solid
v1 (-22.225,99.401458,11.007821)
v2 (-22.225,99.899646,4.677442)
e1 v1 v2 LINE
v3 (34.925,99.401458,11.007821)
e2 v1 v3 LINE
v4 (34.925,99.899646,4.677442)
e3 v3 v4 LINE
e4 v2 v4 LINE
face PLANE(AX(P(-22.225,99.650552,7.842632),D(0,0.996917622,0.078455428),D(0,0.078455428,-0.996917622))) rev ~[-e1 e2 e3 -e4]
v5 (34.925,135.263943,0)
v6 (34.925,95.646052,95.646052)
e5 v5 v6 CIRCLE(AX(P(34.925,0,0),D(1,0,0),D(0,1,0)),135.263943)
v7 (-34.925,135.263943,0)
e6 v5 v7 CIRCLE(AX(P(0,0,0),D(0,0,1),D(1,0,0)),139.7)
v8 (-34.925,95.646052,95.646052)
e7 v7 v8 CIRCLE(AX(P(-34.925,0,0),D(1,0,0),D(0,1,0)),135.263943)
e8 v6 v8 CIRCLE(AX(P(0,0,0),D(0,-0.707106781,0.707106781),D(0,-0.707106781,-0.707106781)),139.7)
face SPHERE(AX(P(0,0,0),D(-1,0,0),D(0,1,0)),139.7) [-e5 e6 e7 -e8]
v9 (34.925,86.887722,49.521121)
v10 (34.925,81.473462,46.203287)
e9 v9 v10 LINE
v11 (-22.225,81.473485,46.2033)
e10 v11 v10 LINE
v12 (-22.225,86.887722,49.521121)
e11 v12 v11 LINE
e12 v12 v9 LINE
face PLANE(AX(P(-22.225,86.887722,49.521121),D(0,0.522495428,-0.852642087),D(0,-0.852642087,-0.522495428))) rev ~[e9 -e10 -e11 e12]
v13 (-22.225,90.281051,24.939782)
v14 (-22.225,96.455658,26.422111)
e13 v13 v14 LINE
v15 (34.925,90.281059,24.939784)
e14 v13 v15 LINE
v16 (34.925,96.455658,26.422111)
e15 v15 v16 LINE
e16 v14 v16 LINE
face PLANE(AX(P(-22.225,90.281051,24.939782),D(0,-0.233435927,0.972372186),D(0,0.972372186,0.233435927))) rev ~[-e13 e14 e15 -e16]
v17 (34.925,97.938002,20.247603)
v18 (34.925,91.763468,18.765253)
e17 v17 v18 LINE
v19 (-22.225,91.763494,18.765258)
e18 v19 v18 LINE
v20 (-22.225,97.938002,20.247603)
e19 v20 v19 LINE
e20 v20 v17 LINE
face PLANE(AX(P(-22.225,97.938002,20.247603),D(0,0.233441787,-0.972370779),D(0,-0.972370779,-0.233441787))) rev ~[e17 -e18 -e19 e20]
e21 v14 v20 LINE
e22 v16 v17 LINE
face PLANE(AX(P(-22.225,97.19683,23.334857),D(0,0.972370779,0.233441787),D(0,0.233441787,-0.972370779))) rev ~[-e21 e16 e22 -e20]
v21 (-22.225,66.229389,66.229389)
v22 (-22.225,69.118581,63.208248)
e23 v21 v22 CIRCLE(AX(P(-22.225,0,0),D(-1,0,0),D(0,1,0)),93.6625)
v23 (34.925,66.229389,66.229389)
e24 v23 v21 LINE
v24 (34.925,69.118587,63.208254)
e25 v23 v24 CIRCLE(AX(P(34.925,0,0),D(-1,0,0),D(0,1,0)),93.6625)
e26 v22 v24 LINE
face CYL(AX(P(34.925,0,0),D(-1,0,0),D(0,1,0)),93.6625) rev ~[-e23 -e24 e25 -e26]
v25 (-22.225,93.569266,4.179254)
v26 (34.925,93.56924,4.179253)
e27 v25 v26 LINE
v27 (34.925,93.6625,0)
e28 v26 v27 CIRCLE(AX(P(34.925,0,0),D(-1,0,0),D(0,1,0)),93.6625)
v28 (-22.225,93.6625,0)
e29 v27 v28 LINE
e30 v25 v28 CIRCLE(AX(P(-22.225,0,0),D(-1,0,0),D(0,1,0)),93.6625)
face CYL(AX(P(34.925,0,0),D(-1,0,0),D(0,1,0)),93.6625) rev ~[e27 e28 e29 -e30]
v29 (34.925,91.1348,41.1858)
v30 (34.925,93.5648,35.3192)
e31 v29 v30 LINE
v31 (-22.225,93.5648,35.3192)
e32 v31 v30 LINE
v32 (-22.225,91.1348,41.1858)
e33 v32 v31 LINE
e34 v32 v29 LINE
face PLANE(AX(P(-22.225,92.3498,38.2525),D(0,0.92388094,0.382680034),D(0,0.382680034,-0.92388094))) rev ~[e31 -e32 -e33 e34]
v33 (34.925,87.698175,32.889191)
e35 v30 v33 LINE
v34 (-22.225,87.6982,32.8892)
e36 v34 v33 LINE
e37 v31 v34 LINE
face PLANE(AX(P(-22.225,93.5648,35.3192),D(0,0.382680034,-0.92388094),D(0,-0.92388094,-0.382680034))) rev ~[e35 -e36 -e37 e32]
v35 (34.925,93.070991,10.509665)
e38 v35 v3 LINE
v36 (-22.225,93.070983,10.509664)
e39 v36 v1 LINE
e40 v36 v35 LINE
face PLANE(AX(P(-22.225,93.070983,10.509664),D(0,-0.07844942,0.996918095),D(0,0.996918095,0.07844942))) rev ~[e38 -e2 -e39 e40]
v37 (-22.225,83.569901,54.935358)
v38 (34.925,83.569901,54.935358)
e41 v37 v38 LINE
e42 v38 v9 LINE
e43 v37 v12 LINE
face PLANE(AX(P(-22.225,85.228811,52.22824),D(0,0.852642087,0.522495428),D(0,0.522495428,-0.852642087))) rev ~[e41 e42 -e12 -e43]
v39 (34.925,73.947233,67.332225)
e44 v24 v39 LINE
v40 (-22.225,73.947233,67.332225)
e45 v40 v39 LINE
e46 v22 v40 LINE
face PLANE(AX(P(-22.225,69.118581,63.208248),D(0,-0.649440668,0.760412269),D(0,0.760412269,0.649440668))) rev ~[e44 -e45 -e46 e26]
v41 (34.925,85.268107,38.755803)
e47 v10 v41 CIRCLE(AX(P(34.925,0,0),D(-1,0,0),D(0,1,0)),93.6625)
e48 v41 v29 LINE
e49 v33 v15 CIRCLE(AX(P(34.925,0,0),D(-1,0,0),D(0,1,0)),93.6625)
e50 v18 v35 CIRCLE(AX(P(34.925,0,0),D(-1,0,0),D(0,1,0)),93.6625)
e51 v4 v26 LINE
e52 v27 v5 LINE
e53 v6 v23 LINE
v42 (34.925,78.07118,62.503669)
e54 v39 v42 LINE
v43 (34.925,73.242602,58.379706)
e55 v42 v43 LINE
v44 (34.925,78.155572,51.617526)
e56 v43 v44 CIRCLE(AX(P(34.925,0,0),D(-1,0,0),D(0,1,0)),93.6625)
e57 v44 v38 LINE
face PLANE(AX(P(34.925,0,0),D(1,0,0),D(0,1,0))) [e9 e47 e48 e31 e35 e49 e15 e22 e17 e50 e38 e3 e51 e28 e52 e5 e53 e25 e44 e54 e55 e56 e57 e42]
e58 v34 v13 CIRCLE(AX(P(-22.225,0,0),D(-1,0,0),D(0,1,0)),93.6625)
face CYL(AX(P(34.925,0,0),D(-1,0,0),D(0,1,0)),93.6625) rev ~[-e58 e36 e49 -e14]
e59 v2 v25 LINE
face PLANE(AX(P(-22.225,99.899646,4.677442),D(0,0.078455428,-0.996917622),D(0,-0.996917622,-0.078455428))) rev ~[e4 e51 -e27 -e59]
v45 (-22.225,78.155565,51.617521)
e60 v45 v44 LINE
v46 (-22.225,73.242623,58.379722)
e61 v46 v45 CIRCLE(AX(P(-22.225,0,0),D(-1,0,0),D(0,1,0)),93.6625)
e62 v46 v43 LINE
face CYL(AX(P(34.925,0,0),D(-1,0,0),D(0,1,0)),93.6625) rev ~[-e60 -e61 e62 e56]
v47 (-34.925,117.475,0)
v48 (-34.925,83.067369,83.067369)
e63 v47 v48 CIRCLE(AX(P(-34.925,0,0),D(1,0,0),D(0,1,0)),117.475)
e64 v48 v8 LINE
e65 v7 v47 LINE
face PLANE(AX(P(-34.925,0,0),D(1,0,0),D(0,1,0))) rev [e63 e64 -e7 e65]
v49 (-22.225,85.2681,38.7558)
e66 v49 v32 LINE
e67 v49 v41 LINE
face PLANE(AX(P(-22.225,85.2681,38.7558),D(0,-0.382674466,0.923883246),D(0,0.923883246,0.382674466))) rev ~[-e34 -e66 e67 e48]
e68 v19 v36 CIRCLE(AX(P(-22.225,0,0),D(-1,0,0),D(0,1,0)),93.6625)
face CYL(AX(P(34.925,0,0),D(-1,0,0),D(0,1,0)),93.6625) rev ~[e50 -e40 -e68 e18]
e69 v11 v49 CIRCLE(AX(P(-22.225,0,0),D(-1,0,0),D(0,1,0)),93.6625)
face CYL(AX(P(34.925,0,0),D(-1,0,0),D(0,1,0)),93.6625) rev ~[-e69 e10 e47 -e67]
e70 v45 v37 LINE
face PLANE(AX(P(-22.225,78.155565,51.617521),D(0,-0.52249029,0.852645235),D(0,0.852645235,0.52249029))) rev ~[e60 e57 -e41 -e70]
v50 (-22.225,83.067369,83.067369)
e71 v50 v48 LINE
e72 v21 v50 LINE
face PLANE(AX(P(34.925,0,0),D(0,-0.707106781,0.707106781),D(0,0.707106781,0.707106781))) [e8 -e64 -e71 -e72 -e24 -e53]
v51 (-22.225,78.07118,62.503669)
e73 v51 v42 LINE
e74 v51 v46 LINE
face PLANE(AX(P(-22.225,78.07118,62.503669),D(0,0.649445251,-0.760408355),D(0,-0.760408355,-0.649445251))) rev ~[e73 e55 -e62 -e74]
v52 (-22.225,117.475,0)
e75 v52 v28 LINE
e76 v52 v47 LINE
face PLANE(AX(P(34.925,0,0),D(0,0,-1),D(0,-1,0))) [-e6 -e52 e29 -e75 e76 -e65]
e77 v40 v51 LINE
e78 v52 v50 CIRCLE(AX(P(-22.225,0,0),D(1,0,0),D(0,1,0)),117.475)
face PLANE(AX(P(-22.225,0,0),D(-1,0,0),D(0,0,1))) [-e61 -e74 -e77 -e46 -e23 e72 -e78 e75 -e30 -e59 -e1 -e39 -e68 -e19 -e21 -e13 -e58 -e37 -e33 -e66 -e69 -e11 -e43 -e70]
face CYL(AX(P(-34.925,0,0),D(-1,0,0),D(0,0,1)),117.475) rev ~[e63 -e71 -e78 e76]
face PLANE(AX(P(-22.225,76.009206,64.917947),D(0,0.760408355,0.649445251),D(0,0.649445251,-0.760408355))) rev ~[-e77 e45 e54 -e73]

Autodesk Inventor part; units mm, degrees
ref_plane "YZ Plane" through (0, 0, 0) normal (1, 0, 0) x (0, 1, 0)
ref_plane "XZ Plane" through (0, 0, 0) normal (0, 1, 0) x (-1, 0, 0)
sketch "Sketch1" plane through (0, 0, 0) normal (0, 0, 1) x (1, 0, 0)
  circle A0 centre (0, 0) radius 139.7
  line L0 (0, 139.7) -> (234.2216, 139.7) construction
  line L1 (-34.925, 185.7375) -> (34.925, 185.7375) construction
  line L2 (34.925, 185.7375) -> (34.925, 93.6625)
  line L3 (34.925, 93.6625) -> (-34.925, 93.6625)
  line L4 (-34.925, 93.6625) -> (-34.925, 185.7375)
  line L5 (-34.925, 185.7375) -> (34.925, 93.6625) construction
  line L6 (34.925, 185.7375) -> (-34.925, 93.6625) construction
  line L7 (0, 0) -> (253.8576, 0) construction
  point P0 (-34.925, 135.2639)
  point P1 (34.925, 135.2639)
  dimension "d6" = 279.4
  dimension "d7" = 69.85
  dimension "d8" = 92.075
  dimension "d9" = 93.6625
revolve "Revolution2" add sketch "Sketch1" angle 360 about axis through (0, 0, 0) along (1, 0, 0) picked at (2.3523, 108.9489) contours L2 L3 L4 A0
sketch "Sketch4" plane through (-34.925, 0, 0) normal (-1, 0, 0) x (0, 0, 1)
  circle A0 centre (0, 0) radius 93.6625 projected
  circle A1 centre (0, 0) radius 117.475
  dimension "d24" = 234.95
extrude "Extrusion3" cut sketch "Sketch4" against normal blind 12.7
sketch "Sketch5" plane through (34.925, 0, 0) normal (1, 0, 0) x (0, 0, -1)
  circle A0 centre (0, 0) radius 93.6625 projected
  circle A1 centre (0, 0) radius 135.2639 projected
  line L0 (0, 0) -> (0, 180.6754)
  line L1 (0, 0) -> (-127.7568, 127.7568)
  line L2 (0, 0) -> (-180.6754, 0)
  line L3 (0, 0) -> (-127.7568, -127.7568)
  line L4 (0, 0) -> (0, -180.6754)
  line L5 (0, 0) -> (127.7568, -127.7568)
  line L6 (0, 0) -> (180.6754, 0)
  line L7 (0, 0) -> (127.7568, 127.7568)
  dimension "d29" = 360
ref_plane "Work Plane1" through (34.925, 0, 0) normal (0, 0, 1) x (0, 1, 0)
pattern_circular "Circular Pattern1" count 8 over 360 about axis through (0, 0, 0) along (1, 0, 0)
split "Split1" plane through (34.925, 0, 0) removes the side toward (0, 0, -1)
split "Split2" plane through (34.925, 0, 0) removes the side toward (0, -0.7071068, 0.7071068)
sketch "Sketch6" plane through (-22.225, 0, 0) normal (-1, 0, 0) x (0, 0, 1)
  arc A0 (66.2294, 66.2294) -> (0, 93.6625) centre (0, 0) ccw projected
  line L0 (0, 0) -> (75.2096, 181.5721) construction
  line L1 (0, 0) -> (196.5323, 0) construction
  line L2 (32.8892, 87.6982) -> (38.7558, 85.2681)
  line L3 (38.7558, 85.2681) -> (41.1858, 91.1348)
  line L4 (41.1858, 91.1348) -> (35.3192, 93.5648)
  line L5 (35.3192, 93.5648) -> (32.8892, 87.6982)
  line L6 (38.2525, 92.3498) -> (35.8225, 86.4831)
  dimension "d37" = 67.5
  dimension "d46" = 6.35
  dimension "d48" = 6.35
extrude "Extrusion4" cut sketch "Sketch6" against normal up to next
pattern_circular "Circular Pattern2" count 40 over 360 about axis through (0, 0, 0) along (1, 0, 0) of "Extrusion4" geometry pattern yes
ref_plane "Work Plane2" through (34.925, 0, 0) normal (0, -0.7071068, 0.7071068) x (0, 0.7071068, 0.7071068)
ref_plane "Work Plane3" through (34.925, 0, 0) normal (0, -1, 0) x (0, 0, 1)
ref_plane "Work Plane4" through (34.925, 0, 0) normal (0, -0.7071068, -0.7071068) x (0, -0.7071068, 0.7071068)
ref_plane "Work Plane5" through (34.925, 0, 0) normal (0, 0, -1) x (0, -1, 0)
ref_plane "Work Plane6" through (34.925, 0, 0) normal (0, 0.7071068, -0.7071068) x (0, -0.7071068, -0.7071068)
ref_plane "Work Plane7" through (34.925, 0, 0) normal (0, 1, 0) x (0, 0, -1)
ref_plane "Work Plane8" through (34.925, 0, 0) normal (0, 0.7071068, 0.7071068) x (0, 0.7071068, -0.7071068)
properties part number "bigWheelWedge01" material "Wood (Maple)"
